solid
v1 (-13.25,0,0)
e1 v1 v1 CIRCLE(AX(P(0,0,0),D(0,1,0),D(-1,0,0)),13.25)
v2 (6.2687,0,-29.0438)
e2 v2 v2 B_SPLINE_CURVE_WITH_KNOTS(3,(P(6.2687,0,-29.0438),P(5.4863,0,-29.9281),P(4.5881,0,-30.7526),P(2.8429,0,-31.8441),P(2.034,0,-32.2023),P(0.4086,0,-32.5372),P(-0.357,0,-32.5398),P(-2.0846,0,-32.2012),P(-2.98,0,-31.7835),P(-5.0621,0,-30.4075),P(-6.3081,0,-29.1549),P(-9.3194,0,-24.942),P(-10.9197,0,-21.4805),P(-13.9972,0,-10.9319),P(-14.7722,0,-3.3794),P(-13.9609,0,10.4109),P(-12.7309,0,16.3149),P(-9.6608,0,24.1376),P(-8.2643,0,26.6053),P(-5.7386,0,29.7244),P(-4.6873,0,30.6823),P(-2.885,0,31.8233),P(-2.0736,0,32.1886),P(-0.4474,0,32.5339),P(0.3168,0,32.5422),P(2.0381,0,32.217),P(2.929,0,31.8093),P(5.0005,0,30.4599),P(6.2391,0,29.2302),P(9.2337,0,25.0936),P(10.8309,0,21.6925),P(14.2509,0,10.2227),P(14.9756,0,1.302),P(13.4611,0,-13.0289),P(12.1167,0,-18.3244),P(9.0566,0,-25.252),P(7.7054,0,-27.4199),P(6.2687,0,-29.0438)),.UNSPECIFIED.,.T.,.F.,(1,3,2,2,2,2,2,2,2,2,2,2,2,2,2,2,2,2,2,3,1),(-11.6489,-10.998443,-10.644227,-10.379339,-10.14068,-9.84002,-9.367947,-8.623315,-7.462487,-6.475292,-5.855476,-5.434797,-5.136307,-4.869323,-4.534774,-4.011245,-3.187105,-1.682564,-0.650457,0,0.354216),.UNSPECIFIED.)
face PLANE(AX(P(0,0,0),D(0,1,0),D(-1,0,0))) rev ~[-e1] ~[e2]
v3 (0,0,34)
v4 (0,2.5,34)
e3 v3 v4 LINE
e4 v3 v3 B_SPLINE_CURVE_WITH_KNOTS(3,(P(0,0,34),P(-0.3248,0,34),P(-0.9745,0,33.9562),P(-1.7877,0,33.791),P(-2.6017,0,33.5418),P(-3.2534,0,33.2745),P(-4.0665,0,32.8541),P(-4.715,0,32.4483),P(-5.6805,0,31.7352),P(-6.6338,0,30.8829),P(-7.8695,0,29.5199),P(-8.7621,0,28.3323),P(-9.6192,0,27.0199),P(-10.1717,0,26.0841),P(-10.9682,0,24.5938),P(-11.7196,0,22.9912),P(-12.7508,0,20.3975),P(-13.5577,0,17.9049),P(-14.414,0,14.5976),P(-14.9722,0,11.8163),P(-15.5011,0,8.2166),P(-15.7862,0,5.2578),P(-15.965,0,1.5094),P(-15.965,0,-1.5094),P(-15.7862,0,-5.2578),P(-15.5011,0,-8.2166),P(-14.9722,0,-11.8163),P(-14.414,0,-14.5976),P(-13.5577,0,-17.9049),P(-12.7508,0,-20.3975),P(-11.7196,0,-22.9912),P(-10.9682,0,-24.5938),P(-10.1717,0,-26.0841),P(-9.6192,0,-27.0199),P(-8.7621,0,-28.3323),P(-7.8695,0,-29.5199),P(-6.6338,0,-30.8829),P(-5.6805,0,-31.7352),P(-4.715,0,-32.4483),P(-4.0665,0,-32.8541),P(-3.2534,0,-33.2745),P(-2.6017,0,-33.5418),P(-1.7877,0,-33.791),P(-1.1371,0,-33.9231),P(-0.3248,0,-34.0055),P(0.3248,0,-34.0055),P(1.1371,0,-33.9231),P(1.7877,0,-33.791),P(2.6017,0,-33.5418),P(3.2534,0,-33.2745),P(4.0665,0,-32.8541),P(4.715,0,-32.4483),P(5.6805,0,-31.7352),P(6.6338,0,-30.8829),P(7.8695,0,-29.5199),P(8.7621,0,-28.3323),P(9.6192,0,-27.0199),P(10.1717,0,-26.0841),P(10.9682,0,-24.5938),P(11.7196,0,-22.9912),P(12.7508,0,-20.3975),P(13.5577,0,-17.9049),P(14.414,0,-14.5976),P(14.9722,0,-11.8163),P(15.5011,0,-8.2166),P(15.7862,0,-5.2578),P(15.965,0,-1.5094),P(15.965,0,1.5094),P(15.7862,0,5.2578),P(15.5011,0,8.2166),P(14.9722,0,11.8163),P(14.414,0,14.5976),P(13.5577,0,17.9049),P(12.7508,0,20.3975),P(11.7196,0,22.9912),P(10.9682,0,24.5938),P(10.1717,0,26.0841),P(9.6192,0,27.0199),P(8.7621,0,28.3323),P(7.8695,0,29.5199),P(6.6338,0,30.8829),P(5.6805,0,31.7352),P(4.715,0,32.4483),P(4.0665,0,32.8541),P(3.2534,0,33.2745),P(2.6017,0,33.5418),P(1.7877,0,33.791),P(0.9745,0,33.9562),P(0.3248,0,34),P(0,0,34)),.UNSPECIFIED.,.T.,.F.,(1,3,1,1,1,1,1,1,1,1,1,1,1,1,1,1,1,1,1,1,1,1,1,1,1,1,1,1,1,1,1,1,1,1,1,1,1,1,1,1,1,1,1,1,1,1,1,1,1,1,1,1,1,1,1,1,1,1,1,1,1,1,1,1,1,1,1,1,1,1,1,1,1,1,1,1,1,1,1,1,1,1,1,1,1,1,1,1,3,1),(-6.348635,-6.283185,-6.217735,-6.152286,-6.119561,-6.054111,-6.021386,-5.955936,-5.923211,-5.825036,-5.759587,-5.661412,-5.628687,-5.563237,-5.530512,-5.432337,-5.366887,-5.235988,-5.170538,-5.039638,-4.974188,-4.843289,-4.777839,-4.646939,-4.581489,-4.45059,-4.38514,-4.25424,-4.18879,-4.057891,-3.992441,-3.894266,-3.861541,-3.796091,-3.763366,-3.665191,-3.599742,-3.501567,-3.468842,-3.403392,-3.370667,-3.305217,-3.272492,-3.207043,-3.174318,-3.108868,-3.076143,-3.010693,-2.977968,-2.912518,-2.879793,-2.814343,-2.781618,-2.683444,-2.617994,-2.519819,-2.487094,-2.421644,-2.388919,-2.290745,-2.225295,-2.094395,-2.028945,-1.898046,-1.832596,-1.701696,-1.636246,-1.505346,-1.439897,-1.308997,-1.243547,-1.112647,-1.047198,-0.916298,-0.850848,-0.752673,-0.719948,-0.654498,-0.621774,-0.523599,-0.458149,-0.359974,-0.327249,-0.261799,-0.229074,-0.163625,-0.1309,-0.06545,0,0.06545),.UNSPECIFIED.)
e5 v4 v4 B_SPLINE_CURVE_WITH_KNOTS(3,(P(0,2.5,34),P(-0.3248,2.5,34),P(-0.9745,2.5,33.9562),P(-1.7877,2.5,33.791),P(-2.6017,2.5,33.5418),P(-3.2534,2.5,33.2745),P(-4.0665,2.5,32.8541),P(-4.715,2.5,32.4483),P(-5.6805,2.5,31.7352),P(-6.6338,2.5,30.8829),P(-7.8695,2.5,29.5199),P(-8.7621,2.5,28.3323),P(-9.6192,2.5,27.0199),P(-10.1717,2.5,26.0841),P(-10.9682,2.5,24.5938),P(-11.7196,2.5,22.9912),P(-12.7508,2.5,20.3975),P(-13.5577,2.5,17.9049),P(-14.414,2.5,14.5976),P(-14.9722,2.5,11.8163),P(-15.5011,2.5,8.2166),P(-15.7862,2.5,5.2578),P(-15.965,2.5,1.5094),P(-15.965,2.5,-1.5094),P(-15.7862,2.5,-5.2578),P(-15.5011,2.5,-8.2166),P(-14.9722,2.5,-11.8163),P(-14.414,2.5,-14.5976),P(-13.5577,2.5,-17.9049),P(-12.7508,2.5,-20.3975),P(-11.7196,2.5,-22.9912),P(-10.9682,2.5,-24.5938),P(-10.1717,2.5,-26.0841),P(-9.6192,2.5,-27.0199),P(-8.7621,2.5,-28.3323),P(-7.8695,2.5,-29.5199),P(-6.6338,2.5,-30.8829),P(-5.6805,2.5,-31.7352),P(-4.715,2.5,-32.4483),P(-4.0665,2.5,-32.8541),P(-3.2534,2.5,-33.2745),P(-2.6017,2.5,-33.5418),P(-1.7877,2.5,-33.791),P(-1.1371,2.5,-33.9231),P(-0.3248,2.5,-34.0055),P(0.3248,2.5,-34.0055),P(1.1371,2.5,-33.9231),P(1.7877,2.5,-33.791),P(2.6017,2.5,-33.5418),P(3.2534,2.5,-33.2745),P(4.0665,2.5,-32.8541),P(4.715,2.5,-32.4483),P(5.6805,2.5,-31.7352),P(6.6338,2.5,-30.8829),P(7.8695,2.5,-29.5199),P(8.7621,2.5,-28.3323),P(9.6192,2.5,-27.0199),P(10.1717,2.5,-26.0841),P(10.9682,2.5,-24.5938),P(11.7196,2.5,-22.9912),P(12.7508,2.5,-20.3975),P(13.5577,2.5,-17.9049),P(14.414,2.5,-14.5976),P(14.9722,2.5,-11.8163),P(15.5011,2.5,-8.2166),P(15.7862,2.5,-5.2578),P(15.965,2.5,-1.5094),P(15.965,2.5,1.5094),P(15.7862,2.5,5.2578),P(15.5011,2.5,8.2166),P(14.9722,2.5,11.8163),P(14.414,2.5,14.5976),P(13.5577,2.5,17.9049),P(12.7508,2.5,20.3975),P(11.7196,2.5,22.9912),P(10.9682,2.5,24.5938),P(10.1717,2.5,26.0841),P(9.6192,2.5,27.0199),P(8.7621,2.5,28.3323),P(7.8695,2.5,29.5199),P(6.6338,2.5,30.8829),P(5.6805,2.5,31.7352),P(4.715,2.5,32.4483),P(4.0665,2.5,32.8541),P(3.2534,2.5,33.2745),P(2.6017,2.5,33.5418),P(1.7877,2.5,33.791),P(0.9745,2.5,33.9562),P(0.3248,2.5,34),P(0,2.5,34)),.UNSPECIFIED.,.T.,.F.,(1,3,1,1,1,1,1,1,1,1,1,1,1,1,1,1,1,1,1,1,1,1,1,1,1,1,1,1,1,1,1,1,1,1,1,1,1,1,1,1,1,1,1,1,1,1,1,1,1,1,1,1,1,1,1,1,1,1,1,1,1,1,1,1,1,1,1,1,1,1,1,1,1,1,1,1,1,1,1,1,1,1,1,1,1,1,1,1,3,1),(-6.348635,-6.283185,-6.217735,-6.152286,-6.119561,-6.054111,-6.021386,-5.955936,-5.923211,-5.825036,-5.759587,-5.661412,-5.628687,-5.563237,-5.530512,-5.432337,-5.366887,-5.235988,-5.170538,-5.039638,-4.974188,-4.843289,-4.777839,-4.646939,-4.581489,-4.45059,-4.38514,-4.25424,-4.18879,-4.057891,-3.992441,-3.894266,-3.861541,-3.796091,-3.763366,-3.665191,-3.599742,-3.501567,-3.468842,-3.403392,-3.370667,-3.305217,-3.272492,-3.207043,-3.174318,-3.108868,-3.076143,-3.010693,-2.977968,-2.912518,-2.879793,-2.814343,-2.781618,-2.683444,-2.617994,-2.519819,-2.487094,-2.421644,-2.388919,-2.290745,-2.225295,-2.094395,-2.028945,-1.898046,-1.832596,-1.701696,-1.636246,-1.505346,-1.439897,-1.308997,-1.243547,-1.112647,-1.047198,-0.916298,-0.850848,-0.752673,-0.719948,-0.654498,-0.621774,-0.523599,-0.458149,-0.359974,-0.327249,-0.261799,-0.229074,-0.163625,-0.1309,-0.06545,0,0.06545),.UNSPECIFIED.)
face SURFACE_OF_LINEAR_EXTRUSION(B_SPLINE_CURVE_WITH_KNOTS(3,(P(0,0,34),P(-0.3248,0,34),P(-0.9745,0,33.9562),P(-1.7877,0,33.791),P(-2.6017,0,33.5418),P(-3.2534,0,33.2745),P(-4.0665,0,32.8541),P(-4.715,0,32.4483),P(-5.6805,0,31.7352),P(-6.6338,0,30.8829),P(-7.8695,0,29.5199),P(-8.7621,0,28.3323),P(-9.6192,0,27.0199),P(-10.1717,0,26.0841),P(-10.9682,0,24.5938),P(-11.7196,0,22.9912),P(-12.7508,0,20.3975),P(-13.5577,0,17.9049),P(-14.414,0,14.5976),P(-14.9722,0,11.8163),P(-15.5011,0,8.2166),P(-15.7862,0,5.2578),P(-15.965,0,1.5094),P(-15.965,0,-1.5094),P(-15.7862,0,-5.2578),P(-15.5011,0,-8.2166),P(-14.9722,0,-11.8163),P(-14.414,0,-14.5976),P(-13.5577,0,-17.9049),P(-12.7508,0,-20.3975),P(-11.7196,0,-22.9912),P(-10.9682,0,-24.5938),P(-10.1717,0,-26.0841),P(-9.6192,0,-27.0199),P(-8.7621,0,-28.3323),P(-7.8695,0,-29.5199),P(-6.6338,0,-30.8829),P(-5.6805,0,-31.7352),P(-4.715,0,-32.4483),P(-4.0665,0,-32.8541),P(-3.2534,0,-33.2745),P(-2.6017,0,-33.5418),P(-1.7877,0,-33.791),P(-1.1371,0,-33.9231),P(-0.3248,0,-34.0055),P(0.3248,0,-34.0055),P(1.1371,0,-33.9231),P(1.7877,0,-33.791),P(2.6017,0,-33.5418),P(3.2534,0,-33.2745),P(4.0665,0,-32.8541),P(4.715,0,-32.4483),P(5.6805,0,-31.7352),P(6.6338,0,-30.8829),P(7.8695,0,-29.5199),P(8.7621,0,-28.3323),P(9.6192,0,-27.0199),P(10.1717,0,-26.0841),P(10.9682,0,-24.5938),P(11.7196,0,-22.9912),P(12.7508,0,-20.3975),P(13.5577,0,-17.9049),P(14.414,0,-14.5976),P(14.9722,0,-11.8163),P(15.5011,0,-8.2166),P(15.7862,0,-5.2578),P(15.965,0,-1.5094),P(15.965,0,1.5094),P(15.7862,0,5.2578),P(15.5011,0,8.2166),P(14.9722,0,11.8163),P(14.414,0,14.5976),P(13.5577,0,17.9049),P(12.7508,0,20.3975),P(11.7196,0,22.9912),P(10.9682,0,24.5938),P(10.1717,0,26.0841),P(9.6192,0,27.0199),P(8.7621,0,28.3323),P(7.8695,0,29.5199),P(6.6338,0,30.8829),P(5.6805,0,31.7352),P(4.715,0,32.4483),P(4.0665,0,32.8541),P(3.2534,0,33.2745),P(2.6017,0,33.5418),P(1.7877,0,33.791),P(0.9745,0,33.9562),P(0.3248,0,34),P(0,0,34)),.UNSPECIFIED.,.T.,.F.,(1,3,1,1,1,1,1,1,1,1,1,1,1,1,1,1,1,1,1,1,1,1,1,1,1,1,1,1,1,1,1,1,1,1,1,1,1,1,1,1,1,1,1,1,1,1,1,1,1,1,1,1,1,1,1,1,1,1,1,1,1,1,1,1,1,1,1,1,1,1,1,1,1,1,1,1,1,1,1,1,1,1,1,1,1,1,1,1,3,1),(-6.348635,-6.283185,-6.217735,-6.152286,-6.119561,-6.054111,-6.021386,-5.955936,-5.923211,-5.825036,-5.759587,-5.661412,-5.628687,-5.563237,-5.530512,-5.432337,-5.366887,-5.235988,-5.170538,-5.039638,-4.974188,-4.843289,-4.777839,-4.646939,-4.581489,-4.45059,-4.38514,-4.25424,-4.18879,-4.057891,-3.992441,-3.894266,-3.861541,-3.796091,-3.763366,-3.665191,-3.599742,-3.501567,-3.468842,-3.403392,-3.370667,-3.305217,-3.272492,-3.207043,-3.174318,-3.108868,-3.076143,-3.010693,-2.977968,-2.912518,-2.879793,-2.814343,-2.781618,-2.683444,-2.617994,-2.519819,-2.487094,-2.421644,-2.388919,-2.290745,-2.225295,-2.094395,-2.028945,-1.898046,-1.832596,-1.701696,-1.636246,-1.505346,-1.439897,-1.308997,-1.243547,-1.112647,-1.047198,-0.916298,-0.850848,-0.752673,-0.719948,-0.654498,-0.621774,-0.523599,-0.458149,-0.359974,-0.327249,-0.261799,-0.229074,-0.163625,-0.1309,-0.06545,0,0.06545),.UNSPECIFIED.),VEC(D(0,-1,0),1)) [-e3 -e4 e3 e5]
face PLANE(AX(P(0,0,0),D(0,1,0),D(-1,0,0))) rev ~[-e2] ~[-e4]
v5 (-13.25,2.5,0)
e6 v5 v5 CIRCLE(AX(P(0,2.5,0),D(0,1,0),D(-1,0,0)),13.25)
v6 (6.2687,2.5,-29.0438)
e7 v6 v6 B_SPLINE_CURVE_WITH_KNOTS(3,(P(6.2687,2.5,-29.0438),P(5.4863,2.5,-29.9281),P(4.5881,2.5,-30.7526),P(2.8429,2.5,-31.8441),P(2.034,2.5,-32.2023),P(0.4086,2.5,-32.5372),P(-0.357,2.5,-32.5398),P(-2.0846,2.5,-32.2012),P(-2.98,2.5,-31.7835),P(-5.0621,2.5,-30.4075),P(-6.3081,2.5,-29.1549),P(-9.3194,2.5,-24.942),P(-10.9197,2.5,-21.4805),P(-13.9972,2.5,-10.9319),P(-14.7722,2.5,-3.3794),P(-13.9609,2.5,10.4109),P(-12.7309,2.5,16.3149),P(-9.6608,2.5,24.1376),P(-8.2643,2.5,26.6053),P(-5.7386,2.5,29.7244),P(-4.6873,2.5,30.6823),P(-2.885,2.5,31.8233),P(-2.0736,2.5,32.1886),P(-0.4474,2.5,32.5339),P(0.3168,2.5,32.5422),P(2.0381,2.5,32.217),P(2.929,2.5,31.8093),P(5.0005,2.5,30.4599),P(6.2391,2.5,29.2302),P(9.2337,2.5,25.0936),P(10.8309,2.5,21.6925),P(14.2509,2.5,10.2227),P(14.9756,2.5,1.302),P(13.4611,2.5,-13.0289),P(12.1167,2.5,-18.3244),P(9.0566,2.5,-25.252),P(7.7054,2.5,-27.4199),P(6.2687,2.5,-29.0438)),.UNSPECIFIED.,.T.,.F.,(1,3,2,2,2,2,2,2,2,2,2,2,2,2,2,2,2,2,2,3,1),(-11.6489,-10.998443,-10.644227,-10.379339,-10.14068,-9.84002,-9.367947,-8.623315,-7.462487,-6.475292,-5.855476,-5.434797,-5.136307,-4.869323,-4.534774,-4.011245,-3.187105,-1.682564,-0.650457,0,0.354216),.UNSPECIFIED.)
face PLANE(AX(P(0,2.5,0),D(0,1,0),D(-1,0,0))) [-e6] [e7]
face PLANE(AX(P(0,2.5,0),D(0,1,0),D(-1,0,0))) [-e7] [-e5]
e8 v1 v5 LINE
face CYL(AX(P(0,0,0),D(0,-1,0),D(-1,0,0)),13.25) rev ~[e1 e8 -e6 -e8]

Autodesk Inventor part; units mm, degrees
ref_plane "YZ Plane" through (0, 0, 0) normal (1, 0, 0) x (0, 1, 0)
ref_plane "XZ Plane" through (0, 0, 0) normal (0, 1, 0) x (-1, 0, 0)
ref_plane "XY Plane" through (0, 0, 0) normal (0, 0, 1) x (1, 0, 0)
sketch "Sketch1" plane through (0, 0, 0) normal (0, 1, 0) x (-1, 0, 0)
  spline S0 degree 3 poles (0, 34) (0.3248, 34) (0.9745, 33.9562) (1.7877, 33.791) (2.6017, 33.5418) (3.2534, 33.2745) (4.0665, 32.8541) (4.715, 32.4483) (5.6805, 31.7352) (6.6338, 30.8829) (7.8695, 29.5199) (8.7621, 28.3323) (9.6192, 27.0199) (10.1717, 26.0841) (10.9682, 24.5938) (11.7196, 22.9912) (12.7508, 20.3975) (13.5577, 17.9049) (14.414, 14.5976) (14.9722, 11.8163) (15.5011, 8.2166) (15.7862, 5.2578) (15.965, 1.5094) (15.965, -1.5094) (15.7862, -5.2578) (15.5011, -8.2166) (14.9722, -11.8163) (14.414, -14.5976) (13.5577, -17.9049) (12.7508, -20.3975) (11.7196, -22.9912) (10.9682, -24.5938) (10.1717, -26.0841) (9.6192, -27.0199) (8.7621, -28.3323) (7.8695, -29.5199) (6.6338, -30.8829) (5.6805, -31.7352) (4.715, -32.4483) (4.0665, -32.8541) (3.2534, -33.2745) (2.6017, -33.5418) (1.7877, -33.791) (1.1371, -33.9231) (0.3248, -34.0055) (-0.3248, -34.0055) (-1.1371, -33.9231) (-1.7877, -33.791) (-2.6017, -33.5418) (-3.2534, -33.2745) (-4.0665, -32.8541) (-4.715, -32.4483) (-5.6805, -31.7352) (-6.6338, -30.8829) (-7.8695, -29.5199) (-8.7621, -28.3323) (-9.6192, -27.0199) (-10.1717, -26.0841) (-10.9682, -24.5938) (-11.7196, -22.9912) (-12.7508, -20.3975) (-13.5577, -17.9049) (-14.414, -14.5976) (-14.9722, -11.8163) (-15.5011, -8.2166) (-15.7862, -5.2578) (-15.965, -1.5094) (-15.965, 1.5094) (-15.7862, 5.2578) (-15.5011, 8.2166) (-14.9722, 11.8163) (-14.414, 14.5976) (-13.5577, 17.9049) (-12.7508, 20.3975) (-11.7196, 22.9912) (-10.9682, 24.5938) (-10.1717, 26.0841) (-9.6192, 27.0199) (-8.7621, 28.3323) (-7.8695, 29.5199) (-6.6338, 30.8829) (-5.6805, 31.7352) (-4.715, 32.4483) (-4.0665, 32.8541) (-3.2534, 33.2745) (-2.6017, 33.5418) (-1.7877, 33.791) (-0.9745, 33.9562) (-0.3248, 34) (0, 34) knots -6.283185 -6.283185 -6.283185 -6.283185 -6.217735 -6.152286 -6.119561 -6.054111 -6.021386 -5.955936 -5.923211 -5.825036 -5.759587 -5.661412 -5.628687 -5.563237 -5.530512 -5.432337 -5.366887 -5.235988 -5.170538 -5.039638 -4.974188 -4.843289 -4.777839 -4.646939 -4.581489 -4.45059 -4.38514 -4.25424 -4.18879 -4.057891 -3.992441 -3.894266 -3.861541 -3.796091 -3.763366 -3.665191 -3.599742 -3.501567 -3.468842 -3.403392 -3.370667 -3.305217 -3.272492 -3.207043 -3.174318 -3.108868 -3.076143 -3.010693 -2.977968 -2.912518 -2.879793 -2.814343 -2.781618 -2.683444 -2.617994 -2.519819 -2.487094 -2.421644 -2.388919 -2.290745 -2.225295 -2.094395 -2.028945 -1.898046 -1.832596 -1.701696 -1.636246 -1.505346 -1.439897 -1.308997 -1.243547 -1.112647 -1.047198 -0.916298 -0.850848 -0.752673 -0.719948 -0.654498 -0.621774 -0.523599 -0.458149 -0.359974 -0.327249 -0.261799 -0.229074 -0.163625 -0.1309 -0.06545 0 0 0 0
  spline S1 degree 3 poles (-6.2687, -29.0438) (-5.4863, -29.9281) (-4.5881, -30.7526) (-2.8429, -31.8441) (-2.034, -32.2023) (-0.4086, -32.5372) (0.357, -32.5398) (2.0846, -32.2012) (2.98, -31.7835) (5.0621, -30.4075) (6.3081, -29.1549) (9.3194, -24.942) (10.9197, -21.4805) (13.9972, -10.9319) (14.7722, -3.3794) (13.9609, 10.4109) (12.7309, 16.3149) (9.6608, 24.1376) (8.2643, 26.6053) (5.7386, 29.7244) (4.6873, 30.6823) (2.885, 31.8233) (2.0736, 32.1886) (0.4474, 32.5339) (-0.3168, 32.5422) (-2.0381, 32.217) (-2.929, 31.8093) (-5.0005, 30.4599) (-6.2391, 29.2302) (-9.2337, 25.0936) (-10.8309, 21.6925) (-14.2509, 10.2227) (-14.9756, 1.302) (-13.4611, -13.0289) (-12.1167, -18.3244) (-9.0566, -25.252) (-7.7054, -27.4199) (-6.2687, -29.0438) knots -10.998443 -10.998443 -10.998443 -10.998443 -10.644227 -10.644227 -10.379339 -10.379339 -10.14068 -10.14068 -9.84002 -9.84002 -9.367947 -9.367947 -8.623315 -8.623315 -7.462487 -7.462487 -6.475292 -6.475292 -5.855476 -5.855476 -5.434797 -5.434797 -5.136307 -5.136307 -4.869323 -4.869323 -4.534774 -4.534774 -4.011245 -4.011245 -3.187105 -3.187105 -1.682564 -1.682564 -0.650457 -0.650457 0 0 0 0
  circle A0 centre (0, 0) radius 13.25
  dimension "d3" = 26.5
extrude "Extrusion1" add sketch "Sketch1" along normal blind 2.5 contours S0 | S1 | A0
extrude "Extrusion2" cut sketch "Sketch1" along normal blind 10 contours A0
thread "Thread1" size "M27x3" class "6H" standard "ANSI Metric M Profile" length 37
properties part number "Smoke visualization bottom" material "ABS Plastic"
